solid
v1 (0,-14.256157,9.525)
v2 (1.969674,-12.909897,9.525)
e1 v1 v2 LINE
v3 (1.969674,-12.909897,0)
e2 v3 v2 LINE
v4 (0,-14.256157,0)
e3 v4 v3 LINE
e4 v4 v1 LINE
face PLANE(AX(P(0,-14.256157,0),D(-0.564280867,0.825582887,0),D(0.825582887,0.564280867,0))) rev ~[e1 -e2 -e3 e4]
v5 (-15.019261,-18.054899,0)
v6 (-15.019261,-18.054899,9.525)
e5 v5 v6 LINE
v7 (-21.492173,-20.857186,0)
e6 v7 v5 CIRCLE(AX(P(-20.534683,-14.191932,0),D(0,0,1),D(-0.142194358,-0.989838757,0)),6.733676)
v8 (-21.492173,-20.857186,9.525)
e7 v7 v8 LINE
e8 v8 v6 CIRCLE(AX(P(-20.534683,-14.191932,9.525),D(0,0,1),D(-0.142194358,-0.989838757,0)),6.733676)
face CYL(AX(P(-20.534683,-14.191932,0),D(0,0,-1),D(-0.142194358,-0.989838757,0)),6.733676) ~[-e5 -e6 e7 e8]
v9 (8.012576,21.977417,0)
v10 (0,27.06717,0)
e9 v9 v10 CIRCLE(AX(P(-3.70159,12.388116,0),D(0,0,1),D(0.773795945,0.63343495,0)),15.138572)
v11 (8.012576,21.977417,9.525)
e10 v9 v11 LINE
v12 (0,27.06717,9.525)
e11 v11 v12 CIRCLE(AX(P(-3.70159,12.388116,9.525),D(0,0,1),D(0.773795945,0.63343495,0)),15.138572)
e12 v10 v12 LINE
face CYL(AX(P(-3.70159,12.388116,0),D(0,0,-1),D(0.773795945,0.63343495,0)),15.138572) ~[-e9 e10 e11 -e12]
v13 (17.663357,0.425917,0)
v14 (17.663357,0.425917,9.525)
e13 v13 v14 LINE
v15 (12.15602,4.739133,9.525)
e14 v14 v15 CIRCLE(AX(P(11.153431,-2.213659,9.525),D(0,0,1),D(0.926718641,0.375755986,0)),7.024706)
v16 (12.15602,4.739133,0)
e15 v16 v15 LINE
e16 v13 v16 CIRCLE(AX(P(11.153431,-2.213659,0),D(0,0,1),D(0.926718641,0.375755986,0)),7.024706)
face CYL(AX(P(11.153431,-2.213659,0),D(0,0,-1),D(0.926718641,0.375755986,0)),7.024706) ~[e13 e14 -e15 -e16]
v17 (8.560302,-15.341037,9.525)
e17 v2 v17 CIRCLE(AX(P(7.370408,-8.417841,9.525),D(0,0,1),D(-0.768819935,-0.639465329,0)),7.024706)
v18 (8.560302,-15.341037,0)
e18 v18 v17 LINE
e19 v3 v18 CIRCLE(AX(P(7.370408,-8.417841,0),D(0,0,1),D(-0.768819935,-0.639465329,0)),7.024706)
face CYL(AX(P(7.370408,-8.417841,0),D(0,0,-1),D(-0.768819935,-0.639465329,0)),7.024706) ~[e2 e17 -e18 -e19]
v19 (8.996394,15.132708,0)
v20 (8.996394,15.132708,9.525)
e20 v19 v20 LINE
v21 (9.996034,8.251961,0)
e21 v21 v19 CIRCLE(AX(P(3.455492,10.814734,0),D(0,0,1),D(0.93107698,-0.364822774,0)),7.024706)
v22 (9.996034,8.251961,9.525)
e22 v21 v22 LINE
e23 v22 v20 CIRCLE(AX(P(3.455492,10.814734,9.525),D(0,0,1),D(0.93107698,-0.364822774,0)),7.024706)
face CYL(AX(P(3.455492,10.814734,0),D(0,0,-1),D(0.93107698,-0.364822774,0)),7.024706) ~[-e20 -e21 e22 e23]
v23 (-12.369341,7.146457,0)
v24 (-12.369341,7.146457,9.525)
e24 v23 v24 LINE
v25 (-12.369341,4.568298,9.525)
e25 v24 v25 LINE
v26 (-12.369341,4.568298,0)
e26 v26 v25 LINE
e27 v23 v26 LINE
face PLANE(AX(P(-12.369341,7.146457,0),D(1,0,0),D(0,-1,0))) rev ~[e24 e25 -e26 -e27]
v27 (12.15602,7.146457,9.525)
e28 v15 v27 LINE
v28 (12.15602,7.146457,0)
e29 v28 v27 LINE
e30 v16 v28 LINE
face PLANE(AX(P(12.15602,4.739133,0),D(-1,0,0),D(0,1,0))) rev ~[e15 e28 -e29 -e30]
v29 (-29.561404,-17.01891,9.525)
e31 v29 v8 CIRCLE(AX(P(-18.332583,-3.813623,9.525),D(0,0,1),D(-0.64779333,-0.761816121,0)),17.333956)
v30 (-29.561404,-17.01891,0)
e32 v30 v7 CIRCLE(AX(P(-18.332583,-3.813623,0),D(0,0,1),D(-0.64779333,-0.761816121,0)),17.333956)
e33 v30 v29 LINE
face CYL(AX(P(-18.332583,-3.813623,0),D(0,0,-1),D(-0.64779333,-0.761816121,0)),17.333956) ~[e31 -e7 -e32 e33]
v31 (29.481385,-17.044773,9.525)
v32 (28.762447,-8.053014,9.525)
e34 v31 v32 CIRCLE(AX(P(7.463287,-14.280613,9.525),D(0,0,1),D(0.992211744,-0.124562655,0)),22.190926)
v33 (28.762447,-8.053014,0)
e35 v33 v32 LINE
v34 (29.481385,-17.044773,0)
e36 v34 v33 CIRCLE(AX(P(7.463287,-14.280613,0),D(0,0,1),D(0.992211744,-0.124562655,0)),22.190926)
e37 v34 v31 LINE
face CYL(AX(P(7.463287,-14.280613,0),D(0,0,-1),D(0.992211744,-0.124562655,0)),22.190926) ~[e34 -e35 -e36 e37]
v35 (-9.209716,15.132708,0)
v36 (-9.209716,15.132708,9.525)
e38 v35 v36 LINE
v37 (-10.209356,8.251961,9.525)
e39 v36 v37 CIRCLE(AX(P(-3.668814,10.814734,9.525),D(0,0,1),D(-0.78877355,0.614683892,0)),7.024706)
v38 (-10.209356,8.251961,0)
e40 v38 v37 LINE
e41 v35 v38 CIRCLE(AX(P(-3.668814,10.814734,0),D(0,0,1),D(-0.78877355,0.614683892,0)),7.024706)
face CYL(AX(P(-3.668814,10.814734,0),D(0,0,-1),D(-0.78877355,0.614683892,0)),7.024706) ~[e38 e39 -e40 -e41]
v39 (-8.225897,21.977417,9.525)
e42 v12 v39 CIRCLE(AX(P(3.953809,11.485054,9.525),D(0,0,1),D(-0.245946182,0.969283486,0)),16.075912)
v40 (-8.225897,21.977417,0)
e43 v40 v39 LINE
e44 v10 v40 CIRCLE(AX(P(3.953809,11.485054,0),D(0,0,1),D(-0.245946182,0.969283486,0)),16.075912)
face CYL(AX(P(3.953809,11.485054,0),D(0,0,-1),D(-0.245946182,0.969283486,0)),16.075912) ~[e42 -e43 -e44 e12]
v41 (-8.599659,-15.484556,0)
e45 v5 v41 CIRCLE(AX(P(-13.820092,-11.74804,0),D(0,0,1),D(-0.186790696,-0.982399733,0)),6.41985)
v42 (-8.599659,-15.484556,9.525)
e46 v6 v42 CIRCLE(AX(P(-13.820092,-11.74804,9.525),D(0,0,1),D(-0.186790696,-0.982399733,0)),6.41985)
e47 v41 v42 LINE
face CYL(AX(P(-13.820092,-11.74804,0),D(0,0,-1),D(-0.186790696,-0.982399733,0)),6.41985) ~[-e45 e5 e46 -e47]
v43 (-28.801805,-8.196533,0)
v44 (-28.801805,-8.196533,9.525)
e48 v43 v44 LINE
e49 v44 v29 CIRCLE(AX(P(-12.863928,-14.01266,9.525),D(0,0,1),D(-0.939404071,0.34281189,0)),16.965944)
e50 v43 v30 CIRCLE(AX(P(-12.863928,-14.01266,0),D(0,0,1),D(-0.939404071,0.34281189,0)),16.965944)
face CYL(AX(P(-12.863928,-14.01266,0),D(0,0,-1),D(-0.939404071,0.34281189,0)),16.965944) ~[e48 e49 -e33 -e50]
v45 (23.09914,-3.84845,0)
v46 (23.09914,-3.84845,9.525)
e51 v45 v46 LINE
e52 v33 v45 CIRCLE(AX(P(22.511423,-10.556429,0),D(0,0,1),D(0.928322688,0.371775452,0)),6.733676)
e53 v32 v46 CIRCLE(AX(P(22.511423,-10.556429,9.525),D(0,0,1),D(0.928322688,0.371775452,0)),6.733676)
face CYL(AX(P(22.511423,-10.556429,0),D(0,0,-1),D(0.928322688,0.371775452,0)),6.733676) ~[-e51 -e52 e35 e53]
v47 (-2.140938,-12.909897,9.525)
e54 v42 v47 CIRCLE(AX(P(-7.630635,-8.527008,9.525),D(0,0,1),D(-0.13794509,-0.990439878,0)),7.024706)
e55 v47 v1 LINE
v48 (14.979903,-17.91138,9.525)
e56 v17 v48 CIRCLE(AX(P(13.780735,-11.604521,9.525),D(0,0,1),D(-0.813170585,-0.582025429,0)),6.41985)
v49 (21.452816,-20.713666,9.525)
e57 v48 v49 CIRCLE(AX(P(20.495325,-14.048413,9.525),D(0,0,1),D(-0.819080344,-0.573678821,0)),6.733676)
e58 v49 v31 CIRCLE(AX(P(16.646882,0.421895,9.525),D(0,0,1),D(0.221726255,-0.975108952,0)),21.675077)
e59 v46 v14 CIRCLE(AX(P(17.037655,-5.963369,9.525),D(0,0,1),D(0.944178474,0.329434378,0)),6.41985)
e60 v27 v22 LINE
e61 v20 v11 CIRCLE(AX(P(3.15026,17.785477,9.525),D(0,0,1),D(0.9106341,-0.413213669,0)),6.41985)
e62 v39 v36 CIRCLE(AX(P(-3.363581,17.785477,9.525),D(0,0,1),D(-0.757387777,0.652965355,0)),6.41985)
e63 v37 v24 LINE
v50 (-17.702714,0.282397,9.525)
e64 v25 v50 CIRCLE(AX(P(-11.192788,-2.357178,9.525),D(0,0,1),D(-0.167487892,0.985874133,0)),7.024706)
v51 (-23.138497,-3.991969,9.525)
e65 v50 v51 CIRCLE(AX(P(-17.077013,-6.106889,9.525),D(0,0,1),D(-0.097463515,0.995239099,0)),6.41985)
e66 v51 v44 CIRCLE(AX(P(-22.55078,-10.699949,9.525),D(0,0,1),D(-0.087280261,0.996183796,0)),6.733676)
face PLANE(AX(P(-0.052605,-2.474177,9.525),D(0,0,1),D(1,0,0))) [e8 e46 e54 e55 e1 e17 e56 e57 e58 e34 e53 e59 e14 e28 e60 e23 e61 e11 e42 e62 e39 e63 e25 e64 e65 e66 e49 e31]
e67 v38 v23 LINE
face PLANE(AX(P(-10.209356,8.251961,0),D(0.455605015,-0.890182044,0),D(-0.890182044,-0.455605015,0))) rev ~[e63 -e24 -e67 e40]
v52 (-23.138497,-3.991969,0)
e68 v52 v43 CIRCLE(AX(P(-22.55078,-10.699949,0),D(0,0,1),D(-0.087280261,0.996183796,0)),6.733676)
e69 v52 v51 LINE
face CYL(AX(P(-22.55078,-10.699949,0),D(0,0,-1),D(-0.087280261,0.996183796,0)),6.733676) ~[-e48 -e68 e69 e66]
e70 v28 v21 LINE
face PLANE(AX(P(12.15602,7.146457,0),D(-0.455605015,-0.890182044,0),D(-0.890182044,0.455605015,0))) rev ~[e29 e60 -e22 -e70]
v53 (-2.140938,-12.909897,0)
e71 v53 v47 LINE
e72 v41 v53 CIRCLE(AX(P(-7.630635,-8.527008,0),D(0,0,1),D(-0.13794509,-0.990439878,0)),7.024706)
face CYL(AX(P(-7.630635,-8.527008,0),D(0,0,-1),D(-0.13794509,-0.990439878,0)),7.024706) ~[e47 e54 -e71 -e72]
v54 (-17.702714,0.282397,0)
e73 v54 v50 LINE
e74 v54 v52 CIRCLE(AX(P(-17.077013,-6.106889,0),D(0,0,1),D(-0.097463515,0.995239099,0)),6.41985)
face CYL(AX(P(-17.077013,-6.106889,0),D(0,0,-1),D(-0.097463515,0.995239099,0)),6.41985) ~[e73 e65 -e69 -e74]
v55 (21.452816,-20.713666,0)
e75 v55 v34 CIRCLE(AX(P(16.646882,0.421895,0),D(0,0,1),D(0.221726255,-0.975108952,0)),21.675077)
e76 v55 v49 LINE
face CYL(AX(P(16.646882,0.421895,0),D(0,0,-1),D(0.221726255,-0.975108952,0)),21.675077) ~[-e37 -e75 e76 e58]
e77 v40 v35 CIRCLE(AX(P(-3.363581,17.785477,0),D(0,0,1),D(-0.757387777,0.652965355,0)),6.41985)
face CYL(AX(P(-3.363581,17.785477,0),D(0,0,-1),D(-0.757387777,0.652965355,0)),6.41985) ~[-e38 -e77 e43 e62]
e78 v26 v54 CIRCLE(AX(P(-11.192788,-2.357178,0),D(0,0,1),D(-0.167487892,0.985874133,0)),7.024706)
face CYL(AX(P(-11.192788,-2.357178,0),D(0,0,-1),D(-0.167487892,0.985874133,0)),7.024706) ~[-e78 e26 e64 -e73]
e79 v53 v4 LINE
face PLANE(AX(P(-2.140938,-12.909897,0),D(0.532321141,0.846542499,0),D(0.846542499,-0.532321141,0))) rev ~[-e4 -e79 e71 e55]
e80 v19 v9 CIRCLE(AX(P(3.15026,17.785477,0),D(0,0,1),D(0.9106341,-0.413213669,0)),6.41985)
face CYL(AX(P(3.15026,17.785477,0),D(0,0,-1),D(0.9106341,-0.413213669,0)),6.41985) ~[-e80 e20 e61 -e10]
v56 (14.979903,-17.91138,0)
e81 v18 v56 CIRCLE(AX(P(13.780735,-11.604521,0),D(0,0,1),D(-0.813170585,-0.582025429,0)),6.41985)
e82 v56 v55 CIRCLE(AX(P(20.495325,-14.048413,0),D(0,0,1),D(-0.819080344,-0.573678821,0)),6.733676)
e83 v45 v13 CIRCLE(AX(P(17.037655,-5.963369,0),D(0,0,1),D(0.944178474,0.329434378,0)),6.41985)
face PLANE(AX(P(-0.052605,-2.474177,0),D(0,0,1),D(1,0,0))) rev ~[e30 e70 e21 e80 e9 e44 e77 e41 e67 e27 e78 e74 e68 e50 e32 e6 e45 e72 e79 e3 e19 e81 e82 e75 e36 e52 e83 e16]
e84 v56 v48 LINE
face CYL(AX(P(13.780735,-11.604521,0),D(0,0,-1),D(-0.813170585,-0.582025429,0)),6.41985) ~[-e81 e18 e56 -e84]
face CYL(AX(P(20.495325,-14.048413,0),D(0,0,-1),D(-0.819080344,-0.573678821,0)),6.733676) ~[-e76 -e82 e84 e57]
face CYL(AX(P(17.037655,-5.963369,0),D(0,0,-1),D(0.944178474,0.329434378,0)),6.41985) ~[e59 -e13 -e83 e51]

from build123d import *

# Parameters (mm, degrees)
F1_DEPTH = 9.525


# Not quite as in the source:
# - a length typed as a fraction of an inch, garbled in the dataset ("3 / 203.2 mm" for 3/8 in), is restored


with BuildPart() as f1:
    # F0 (on Top) → F1 (new body)
    with BuildSketch(Plane.XY):
        with BuildLine():
            ThreePointArc((0, 27.0671695471), (-4.5048536548, 25.1556778504), (-8.2258973271, 21.977417171))
            ThreePointArc((-8.2258973271, 21.977417171), (-9.7181261566, 18.698842434), (-9.2097157612, 15.1327075437))
            ThreePointArc((-9.2097157612, 15.1327075437), (-10.6205392688, 11.8246856933), (-10.2093555033, 8.2519613206))
            Line((-10.2093555033, 8.2519613206), (-12.369341217, 7.1464567445))
            Line((-12.369341217, 7.1464567445), (-12.369341217, 4.6386048198))
            Line((-12.369341217, 4.6386048198), (-12.369341217, 4.5682978211))
            ThreePointArc((-12.369341217, 4.5682978211), (-15.5930977879, 3.1185654947), (-17.7027139134, 0.2823972963))
            ThreePointArc((-17.7027139134, 0.2823972963), (-21.0452825194, -1.0603738309), (-23.1384971151, -3.9919692741))
            ThreePointArc((-23.1384971151, -3.9919692741), (-26.5647165348, -5.2934051439), (-28.80180468, -8.19653302))
            ThreePointArc((-28.80180468, -8.19653302), (-29.7673344436, -12.5572908836), (-29.5614041388, -17.0189104974))
            ThreePointArc((-29.5614041388, -17.0189104974), (-25.7783661022, -19.4669407743), (-21.4921734029, -20.8571857766))
            ThreePointArc((-21.4921734029, -20.8571857766), (-17.8594468391, -20.3713745504), (-15.0192606046, -18.054899429))
            ThreePointArc((-15.0192606046, -18.054899429), (-11.4338171794, -17.7079201351), (-8.5996589687, -15.484556372))
            ThreePointArc((-8.5996589687, -15.484556372), (-5.0294162563, -15.0523544446), (-2.1409380715, -12.9098966718))
            Line((-2.1409380715, -12.9098966718), (0, -14.2561570176))
            Line((0, -14.2561570176), (1.9696742658, -12.9098966718))
            ThreePointArc((1.9696742658, -12.9098966718), (4.9392756736, -15.0084468105), (8.560301624, -15.3410370587))
            ThreePointArc((8.560301624, -15.3410370587), (11.3944598347, -17.5644008218), (14.9799032599, -17.9113801157))
            ThreePointArc((14.9799032599, -17.9113801157), (17.8200894944, -20.2278552371), (21.4528160582, -20.7136664634))
            ThreePointArc((21.4528160582, -20.7136664634), (25.6558468929, -19.2922500665), (29.4813849032, -17.0447733253))
            ThreePointArc((29.4813849032, -17.0447733253), (29.5836204245, -12.511977875), (28.7624473353, -8.0530137067))
            ThreePointArc((28.7624473353, -8.0530137067), (26.5253591901, -5.1498858306), (23.0991397704, -3.8484499608))
            ThreePointArc((23.0991397704, -3.8484499608), (21.0059251747, -0.9168545176), (17.6633565687, 0.4259166096))
            ThreePointArc((17.6633565687, 0.4259166096), (15.4847616458, 3.3168082822), (12.1560195839, 4.739132713))
            Line((12.1560195839, 4.739132713), (12.1560195839, 7.1464567445))
            Line((12.1560195839, 7.1464567445), (9.9960338703, 8.2519613206))
            ThreePointArc((9.9960338703, 8.2519613206), (10.4072176357, 11.8246856933), (8.9963941282, 15.1327075437))
            ThreePointArc((8.9963941282, 15.1327075437), (9.5048045235, 18.698842434), (8.012575694, 21.977417171))
            ThreePointArc((8.012575694, 21.977417171), (4.4155385291, 25.1665589), (0, 27.0671695471))
        make_face()
    extrude(amount=F1_DEPTH)


solid = f1.part
